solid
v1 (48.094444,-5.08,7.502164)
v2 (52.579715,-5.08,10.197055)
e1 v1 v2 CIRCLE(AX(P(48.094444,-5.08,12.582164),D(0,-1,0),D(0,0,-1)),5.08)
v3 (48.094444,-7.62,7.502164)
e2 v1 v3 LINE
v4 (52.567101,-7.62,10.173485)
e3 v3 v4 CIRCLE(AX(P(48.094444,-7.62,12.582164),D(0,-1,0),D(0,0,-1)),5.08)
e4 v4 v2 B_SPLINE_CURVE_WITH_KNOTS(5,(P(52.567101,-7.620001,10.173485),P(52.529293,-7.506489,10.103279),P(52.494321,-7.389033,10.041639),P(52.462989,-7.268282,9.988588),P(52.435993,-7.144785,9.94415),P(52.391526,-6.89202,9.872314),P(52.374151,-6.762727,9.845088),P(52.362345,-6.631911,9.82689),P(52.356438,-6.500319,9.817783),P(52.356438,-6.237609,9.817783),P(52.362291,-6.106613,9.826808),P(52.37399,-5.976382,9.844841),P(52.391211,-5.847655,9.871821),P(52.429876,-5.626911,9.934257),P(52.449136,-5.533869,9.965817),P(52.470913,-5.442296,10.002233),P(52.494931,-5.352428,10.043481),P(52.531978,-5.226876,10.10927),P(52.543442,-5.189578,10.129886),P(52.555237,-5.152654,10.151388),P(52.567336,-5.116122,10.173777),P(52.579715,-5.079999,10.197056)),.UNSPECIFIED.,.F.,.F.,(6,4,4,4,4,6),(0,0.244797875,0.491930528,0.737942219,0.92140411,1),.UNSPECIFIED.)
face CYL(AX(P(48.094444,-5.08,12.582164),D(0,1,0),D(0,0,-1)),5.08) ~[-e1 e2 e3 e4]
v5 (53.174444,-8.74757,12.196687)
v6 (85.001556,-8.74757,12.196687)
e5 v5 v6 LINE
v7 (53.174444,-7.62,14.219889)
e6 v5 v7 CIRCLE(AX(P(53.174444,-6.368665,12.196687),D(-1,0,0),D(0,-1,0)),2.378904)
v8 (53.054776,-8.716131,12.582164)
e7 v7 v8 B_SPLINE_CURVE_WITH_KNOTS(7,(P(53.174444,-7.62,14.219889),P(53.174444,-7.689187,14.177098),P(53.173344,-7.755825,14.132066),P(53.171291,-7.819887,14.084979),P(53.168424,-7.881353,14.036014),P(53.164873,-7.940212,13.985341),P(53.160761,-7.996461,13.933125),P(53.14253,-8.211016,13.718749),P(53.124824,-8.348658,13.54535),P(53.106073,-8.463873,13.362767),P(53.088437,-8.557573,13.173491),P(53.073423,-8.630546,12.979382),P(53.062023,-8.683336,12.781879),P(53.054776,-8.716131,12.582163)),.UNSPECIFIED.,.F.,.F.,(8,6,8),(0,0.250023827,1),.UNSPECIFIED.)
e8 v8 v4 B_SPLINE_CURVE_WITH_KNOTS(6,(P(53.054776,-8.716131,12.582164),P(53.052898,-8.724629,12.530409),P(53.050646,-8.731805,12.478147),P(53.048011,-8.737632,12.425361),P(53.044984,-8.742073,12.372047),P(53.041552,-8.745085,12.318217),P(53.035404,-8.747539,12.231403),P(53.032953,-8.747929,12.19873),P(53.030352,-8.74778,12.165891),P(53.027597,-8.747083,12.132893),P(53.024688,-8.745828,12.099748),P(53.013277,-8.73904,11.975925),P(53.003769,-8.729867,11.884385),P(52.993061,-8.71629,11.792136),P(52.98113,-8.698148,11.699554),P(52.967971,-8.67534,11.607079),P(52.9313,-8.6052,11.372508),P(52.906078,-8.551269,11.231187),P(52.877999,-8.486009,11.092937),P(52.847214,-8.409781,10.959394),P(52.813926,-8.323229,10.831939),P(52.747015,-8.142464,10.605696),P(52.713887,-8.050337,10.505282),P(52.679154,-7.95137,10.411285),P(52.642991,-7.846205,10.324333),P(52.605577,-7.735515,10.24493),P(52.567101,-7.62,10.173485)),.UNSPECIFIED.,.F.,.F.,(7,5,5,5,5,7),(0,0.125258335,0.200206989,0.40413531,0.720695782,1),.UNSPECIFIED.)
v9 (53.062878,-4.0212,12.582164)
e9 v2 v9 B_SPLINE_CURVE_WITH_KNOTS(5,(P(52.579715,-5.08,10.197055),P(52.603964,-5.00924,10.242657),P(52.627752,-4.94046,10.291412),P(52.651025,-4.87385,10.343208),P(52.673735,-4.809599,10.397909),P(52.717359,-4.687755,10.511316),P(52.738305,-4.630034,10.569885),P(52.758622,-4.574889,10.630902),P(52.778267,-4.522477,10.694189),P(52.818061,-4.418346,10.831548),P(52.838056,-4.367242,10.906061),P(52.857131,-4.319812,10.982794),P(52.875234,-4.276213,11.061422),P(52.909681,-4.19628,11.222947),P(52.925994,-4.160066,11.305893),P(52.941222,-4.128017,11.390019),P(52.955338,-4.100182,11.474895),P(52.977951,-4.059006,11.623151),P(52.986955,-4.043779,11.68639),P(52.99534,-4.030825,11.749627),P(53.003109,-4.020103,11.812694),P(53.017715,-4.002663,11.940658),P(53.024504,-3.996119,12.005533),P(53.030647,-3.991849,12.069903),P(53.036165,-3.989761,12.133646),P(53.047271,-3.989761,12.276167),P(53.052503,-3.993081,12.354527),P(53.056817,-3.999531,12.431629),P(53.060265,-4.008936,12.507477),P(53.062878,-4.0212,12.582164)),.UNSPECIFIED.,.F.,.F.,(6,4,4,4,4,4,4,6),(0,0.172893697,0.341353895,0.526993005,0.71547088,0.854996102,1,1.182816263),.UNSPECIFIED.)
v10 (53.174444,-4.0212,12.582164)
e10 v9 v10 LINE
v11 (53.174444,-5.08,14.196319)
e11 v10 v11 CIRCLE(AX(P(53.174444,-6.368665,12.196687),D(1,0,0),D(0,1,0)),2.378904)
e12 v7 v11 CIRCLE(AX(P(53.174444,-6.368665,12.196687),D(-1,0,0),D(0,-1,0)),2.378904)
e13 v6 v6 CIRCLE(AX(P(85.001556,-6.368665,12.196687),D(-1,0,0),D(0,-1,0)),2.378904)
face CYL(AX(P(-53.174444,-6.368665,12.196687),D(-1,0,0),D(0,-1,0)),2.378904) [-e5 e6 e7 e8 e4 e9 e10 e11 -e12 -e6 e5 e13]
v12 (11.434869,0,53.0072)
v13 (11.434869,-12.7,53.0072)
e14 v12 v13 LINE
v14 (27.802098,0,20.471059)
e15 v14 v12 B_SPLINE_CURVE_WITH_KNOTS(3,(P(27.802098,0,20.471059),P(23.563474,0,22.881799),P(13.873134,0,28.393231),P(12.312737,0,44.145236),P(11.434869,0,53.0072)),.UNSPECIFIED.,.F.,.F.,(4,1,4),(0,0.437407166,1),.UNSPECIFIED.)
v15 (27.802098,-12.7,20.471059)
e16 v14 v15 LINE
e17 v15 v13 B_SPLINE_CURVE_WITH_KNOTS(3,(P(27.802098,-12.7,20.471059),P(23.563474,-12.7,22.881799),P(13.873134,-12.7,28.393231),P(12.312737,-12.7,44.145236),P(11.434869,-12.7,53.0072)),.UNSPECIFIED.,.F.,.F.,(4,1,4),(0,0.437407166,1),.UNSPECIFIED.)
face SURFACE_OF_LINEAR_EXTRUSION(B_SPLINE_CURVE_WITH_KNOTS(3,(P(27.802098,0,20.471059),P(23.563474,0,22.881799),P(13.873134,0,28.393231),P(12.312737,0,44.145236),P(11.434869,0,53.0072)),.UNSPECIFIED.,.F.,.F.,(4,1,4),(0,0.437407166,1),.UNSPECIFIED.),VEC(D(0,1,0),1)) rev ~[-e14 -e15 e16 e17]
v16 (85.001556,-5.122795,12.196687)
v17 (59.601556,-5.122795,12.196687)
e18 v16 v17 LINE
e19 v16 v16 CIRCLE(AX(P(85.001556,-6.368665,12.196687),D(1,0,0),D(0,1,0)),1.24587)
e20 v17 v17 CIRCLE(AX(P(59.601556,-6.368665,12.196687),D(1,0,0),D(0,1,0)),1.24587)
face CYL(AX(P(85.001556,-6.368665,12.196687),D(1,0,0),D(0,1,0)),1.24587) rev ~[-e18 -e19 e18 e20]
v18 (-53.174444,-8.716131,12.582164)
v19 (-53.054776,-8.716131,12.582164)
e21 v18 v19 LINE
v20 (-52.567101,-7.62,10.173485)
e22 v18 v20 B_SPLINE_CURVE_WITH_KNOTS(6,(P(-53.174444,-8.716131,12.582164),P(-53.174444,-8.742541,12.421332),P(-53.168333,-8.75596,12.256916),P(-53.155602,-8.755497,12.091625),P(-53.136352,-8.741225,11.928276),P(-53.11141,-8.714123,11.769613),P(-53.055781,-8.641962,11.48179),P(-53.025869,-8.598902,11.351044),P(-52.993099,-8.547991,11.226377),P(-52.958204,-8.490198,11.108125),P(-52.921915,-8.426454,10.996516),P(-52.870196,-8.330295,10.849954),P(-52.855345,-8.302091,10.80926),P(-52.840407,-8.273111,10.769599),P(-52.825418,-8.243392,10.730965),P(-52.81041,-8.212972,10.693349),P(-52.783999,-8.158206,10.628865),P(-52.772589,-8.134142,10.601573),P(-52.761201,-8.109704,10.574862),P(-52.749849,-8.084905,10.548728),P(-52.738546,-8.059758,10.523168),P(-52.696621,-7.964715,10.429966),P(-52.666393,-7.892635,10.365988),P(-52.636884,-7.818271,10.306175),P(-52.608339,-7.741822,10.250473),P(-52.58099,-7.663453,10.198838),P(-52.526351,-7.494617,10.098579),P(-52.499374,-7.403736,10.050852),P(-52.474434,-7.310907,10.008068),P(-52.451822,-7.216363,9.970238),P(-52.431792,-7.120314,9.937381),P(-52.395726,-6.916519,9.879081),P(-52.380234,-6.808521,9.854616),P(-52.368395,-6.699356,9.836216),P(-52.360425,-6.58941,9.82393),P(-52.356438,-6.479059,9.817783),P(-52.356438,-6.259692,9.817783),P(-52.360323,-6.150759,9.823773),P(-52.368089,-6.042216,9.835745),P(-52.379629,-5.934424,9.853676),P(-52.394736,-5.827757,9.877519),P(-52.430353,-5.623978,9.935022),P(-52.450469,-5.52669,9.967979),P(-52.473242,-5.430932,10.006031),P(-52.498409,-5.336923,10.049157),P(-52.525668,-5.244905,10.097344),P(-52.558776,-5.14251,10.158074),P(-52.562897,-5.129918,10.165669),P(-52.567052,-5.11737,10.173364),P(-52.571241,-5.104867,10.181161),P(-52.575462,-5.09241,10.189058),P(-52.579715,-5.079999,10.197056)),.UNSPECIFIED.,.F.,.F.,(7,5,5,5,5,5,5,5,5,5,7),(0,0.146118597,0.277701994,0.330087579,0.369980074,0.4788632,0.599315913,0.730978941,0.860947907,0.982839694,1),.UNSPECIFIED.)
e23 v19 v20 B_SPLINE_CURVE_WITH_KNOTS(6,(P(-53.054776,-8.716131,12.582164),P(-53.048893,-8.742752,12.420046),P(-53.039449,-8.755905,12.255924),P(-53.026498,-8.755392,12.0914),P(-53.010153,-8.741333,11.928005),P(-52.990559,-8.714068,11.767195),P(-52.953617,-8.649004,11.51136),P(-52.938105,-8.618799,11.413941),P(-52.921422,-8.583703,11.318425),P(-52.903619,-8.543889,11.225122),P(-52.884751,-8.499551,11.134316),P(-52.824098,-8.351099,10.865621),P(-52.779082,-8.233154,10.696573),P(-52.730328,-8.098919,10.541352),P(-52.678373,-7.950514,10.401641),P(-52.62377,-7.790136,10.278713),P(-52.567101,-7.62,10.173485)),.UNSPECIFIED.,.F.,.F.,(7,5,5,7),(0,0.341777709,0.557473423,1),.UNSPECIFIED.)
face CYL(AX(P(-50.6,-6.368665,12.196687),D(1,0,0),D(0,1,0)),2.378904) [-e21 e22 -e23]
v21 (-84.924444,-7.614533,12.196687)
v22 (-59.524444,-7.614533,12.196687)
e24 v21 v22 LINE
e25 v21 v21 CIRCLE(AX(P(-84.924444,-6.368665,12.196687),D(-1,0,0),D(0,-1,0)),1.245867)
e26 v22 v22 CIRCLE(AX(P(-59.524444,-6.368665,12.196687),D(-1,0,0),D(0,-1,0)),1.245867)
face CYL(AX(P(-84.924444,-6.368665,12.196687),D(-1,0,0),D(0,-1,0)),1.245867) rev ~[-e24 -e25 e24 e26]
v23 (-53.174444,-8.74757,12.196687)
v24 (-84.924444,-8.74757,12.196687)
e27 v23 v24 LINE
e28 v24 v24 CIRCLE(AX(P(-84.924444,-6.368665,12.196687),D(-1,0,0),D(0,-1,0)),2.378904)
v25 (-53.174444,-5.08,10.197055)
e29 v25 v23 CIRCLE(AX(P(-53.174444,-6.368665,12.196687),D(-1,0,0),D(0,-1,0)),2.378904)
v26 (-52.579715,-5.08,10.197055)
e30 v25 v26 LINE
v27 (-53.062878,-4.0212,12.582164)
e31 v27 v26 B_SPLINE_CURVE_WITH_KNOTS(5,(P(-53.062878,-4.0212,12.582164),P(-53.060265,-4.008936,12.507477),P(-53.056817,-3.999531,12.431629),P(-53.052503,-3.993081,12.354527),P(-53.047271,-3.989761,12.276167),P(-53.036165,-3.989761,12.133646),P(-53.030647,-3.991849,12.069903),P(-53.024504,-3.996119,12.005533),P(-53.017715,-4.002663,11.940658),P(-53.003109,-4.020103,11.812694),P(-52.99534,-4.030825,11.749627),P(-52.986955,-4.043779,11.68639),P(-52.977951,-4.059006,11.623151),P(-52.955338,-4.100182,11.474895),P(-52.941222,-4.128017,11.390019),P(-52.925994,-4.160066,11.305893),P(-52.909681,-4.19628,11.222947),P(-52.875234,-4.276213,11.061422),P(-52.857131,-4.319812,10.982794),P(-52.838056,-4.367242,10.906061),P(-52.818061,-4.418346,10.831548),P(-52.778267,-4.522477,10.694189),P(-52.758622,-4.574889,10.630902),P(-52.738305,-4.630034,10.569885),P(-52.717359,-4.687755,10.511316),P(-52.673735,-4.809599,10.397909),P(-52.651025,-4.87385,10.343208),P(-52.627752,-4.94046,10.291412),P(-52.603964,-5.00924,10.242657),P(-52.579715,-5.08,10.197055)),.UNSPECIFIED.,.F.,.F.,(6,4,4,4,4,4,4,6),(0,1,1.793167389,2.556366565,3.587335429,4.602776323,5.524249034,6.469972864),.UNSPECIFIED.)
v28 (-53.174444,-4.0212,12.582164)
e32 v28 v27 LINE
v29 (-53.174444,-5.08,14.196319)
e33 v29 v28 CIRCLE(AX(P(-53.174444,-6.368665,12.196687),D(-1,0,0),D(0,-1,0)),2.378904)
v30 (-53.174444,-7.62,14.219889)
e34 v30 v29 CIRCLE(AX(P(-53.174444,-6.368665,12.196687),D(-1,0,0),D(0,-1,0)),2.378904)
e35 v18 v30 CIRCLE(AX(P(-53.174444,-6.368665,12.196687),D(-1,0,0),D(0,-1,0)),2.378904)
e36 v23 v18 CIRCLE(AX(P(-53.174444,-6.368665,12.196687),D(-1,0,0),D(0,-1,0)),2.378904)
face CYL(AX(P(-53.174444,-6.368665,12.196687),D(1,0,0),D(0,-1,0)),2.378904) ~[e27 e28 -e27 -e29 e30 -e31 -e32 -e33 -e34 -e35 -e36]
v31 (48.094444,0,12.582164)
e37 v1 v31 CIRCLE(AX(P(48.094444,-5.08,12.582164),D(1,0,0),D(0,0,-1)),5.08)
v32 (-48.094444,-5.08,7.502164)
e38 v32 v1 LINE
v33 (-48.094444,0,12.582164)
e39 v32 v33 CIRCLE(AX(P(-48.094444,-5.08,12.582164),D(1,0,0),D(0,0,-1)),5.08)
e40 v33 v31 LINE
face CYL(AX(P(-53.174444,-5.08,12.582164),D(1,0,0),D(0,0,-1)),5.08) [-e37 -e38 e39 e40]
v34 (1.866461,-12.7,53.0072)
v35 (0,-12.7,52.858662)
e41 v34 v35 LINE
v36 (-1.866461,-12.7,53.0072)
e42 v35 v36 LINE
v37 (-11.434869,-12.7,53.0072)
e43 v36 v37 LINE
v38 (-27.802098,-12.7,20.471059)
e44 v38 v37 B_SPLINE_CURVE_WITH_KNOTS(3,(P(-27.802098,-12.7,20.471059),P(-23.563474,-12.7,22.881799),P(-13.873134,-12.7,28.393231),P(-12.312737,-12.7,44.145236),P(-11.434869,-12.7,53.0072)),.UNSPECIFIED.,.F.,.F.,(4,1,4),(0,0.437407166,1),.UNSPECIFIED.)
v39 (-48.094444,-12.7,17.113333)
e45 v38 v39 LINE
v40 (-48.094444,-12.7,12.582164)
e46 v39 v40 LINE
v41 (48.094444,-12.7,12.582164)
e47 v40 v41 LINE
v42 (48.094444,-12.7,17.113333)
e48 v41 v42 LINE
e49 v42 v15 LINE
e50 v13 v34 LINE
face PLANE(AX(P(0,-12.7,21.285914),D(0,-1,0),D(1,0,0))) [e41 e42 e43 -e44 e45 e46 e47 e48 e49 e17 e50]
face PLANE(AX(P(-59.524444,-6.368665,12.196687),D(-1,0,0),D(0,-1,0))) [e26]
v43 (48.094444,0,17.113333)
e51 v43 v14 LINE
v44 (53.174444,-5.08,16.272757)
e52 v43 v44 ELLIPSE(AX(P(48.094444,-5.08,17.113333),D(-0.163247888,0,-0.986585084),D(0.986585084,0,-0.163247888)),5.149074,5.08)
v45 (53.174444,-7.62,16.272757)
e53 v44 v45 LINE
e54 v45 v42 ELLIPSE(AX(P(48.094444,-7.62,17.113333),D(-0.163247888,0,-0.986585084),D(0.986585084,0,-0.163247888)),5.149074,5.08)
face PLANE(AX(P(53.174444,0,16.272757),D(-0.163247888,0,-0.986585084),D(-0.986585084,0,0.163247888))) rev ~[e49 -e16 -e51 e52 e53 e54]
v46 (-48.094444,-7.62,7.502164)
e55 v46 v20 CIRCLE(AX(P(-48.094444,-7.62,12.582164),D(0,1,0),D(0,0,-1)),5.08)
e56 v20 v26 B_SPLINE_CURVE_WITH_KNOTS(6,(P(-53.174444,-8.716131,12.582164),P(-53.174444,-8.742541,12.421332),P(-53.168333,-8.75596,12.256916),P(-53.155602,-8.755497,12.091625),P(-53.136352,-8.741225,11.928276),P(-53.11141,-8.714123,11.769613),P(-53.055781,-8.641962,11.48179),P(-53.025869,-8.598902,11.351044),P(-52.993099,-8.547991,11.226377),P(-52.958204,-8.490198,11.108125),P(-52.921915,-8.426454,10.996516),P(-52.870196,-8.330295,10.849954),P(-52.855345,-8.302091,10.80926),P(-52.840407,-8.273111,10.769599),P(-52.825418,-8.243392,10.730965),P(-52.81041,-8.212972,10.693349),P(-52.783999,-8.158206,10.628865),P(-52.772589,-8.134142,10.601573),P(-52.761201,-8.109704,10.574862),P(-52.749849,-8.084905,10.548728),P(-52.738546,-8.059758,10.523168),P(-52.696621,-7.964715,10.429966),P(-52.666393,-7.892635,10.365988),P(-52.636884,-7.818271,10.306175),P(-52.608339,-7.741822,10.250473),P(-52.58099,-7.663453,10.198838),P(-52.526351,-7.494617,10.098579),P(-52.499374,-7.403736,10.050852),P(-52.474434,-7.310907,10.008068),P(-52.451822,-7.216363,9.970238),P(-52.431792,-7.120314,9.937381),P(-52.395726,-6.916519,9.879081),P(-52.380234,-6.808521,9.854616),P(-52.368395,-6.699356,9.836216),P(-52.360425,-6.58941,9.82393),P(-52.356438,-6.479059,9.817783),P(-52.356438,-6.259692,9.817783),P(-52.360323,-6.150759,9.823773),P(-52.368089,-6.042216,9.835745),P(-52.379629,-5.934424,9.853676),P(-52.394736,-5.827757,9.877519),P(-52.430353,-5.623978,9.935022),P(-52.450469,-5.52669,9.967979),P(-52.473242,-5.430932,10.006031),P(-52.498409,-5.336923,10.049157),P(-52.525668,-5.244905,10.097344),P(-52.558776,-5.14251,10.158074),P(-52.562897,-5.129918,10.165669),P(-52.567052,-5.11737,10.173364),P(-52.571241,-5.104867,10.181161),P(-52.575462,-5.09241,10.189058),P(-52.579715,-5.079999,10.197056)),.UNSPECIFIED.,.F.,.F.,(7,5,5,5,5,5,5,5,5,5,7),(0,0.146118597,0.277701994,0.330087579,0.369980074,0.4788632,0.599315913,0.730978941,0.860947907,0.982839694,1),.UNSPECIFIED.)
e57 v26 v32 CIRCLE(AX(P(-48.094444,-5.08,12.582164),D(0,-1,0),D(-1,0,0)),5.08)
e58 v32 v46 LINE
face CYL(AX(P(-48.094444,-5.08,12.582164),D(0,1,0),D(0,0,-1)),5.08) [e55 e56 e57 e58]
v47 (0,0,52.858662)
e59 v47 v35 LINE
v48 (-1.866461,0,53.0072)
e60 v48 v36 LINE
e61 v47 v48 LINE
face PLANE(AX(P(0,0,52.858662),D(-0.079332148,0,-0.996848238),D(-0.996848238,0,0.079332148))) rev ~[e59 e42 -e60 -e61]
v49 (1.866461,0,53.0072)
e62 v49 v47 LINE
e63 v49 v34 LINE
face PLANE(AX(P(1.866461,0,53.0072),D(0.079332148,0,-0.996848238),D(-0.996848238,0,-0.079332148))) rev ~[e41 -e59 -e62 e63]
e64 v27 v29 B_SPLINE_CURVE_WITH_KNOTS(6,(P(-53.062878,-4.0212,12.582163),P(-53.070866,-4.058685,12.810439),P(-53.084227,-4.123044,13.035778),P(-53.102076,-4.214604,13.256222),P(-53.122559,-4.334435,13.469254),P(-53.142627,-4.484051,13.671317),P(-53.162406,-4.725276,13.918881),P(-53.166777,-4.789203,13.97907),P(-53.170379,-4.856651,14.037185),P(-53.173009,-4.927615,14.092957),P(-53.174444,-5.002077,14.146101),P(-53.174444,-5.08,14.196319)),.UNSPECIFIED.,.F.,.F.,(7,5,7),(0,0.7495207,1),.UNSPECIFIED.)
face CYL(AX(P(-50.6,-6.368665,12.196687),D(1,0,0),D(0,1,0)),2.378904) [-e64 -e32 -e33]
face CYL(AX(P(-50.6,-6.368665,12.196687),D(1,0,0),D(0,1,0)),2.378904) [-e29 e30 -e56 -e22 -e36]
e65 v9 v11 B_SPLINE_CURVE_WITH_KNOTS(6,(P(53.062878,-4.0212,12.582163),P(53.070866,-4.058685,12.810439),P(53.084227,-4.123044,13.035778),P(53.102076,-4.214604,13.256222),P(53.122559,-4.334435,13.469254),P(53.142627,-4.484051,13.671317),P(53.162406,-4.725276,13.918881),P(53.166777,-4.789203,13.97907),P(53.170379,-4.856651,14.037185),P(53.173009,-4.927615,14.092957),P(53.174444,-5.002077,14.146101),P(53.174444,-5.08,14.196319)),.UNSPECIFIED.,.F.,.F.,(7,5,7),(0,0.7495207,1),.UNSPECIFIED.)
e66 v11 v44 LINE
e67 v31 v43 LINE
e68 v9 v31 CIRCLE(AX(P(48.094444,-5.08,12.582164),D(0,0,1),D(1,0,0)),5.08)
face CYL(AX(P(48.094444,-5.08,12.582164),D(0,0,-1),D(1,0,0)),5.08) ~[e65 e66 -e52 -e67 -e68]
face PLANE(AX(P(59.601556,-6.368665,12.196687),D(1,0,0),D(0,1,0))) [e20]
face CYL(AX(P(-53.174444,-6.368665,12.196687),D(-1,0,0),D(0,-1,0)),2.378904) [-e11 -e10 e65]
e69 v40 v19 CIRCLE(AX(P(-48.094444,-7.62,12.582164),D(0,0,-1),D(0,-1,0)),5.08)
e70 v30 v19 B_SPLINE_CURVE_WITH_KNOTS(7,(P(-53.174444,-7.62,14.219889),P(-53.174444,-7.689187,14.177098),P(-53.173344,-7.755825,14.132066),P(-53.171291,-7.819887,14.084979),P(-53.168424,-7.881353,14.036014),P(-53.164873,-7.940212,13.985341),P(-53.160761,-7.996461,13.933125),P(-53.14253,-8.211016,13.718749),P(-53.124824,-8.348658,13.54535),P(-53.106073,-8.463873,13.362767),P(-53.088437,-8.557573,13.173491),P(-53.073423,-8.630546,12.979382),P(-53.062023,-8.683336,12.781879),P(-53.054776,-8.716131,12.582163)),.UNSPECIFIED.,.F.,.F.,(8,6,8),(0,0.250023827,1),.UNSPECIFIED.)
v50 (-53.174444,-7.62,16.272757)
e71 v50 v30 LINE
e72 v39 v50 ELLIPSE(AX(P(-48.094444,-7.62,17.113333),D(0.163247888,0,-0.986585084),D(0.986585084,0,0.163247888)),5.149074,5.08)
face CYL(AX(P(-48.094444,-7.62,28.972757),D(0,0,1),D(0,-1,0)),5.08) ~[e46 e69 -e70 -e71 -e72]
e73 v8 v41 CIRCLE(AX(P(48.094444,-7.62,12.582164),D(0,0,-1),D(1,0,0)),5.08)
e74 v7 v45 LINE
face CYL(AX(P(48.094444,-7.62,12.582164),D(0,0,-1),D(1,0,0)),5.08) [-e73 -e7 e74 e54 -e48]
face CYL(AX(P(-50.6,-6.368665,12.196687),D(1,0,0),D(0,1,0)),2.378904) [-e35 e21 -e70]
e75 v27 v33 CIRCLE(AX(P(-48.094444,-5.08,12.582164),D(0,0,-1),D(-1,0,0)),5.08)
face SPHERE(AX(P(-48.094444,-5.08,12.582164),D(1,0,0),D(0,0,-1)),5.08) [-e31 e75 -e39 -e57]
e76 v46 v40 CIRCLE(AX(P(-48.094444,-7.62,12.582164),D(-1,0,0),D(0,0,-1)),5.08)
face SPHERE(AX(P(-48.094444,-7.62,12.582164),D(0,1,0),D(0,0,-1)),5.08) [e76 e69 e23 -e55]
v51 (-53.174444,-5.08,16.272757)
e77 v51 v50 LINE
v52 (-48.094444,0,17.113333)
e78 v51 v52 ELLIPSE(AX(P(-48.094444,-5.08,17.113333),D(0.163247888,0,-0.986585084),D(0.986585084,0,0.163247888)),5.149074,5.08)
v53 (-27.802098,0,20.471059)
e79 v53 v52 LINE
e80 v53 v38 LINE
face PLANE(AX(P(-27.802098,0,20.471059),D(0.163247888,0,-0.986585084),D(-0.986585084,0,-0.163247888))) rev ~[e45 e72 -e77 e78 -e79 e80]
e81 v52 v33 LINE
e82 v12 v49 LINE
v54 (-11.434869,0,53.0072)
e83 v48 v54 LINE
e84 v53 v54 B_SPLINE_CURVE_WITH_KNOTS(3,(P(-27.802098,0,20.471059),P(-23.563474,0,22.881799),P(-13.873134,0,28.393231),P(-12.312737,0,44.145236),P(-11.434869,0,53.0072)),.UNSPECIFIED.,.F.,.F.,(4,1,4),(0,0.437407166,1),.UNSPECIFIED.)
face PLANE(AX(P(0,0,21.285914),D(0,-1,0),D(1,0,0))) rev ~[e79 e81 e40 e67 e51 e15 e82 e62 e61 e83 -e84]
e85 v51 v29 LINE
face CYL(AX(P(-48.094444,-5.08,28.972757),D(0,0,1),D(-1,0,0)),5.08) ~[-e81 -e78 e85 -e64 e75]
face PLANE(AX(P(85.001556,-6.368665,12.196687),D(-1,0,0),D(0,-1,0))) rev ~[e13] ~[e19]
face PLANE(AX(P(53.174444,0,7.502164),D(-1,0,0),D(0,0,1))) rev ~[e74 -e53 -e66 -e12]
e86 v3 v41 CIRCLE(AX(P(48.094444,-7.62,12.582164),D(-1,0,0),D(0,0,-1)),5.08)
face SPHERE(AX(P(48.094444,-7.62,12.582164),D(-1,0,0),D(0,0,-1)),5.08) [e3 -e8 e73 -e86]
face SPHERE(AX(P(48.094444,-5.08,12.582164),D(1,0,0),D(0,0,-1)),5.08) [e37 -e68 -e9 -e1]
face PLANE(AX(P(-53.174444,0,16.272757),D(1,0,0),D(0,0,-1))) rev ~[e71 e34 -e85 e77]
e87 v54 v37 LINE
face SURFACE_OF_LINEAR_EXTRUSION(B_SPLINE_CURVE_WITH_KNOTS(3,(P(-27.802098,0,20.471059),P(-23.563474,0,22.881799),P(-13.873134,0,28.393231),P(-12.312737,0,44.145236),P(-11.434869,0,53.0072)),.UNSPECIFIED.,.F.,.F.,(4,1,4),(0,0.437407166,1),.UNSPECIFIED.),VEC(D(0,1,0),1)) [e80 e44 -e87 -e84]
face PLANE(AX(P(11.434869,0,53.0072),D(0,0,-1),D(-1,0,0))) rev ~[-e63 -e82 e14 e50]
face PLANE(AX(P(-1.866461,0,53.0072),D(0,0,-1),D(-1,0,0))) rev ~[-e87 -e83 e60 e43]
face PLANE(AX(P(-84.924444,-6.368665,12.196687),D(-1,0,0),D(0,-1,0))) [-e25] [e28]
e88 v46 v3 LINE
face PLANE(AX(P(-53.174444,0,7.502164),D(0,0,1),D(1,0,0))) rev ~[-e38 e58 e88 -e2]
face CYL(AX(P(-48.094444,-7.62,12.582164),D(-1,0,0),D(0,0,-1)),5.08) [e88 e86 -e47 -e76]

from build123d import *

# Parameters (mm, degrees)
F1_DEPTH      = 12.7
F2_R          = 2.3789042868
F3_DEPTH      = 31.75
F3_DEPTH_BACK = 138.176
F4_R          = 5.08
F5_T4_ANGLE   = 90
F5_S5_R       = 2.3789042868
F5_T6_DEPTH   = 6
F5_T10_DEPTH  = 20.32
F5_S11_R      = 2.3789042868
F5_T12_DEPTH  = 12
F5_T16_DEPTH  = 16.390593442
F5_S17_R      = 2.3789042868
F5_T18_DEPTH  = 10
F6_T1_DEPTH   = 113.968887086
F6_T6_ANGLE   = 90.0000000017
F6_S7_R       = 2.3789042868
F6_T8_DEPTH   = 6
F6_T12_DEPTH  = 16.390593442
F6_S13_R      = 2.3789042868
F6_T14_DEPTH  = 10
F7_R          = 1.2458673334
F8_DEPTH      = 25.4
F9_T4_DEPTH   = 16.390593442
F9_S5_R       = 2.3789042868
F9_T6_DEPTH   = 10
F9_T10_DEPTH  = 16.390593442
F9_S11_R      = 2.3789042868
F9_T12_DEPTH  = 10
F9_T16_ANGLE  = 90
F9_S17_R      = 2.3789042868
F9_T18_DEPTH  = 6
F9_T22_DEPTH  = 2.54
F9_S23_R      = 2.3789042868
F9_T24_DEPTH  = 5
F9_T28_ANGLE  = 90.0000000017
F9_S29_R      = 2.3789042868
F9_T30_DEPTH  = 6
F10_R         = 1.24587
F11_DEPTH     = 25.4


# Not quite as in the source:
# - a fillet or chamfer that OpenCascade refuses, or shapes differently, is made with other operations: its cross-section is extruded or revolved along the edge and cut away or added


with BuildPart() as f1:
    # F0 (on Front) → F1 (new body)
    with BuildSketch(Plane.XZ):
        with BuildLine():
            Line((-53.174443543, 7.5021637604), (0, 7.5021637604))
            Line((0, 7.5021637604), (53.174443543, 7.5021637604))
            Line((53.174443543, 7.5021637604), (53.174443543, 16.2727572024))
            Line((53.174443543, 16.2727572024), (27.8020980501, 20.4710588867))
            add(Edge.make_bspline(
                [(27.8020980501, 20.4710588867), (23.5634737704, 22.8817989501), (13.8731335003, 28.3932314282), (12.3127368707, 44.1452356637), (11.4348689094, 53.0072003603)],
                knots=[0, 0, 0, 0, 0.4374071665, 1, 1, 1, 1], degree=3))
            Line((11.4348689094, 53.0072003603), (1.8664607778, 53.0072003603))
            Line((1.8664607778, 53.0072003603), (0, 52.8586618602))
            Line((0, 52.8586618602), (-1.8664607778, 53.0072003603))
            Line((-1.8664607778, 53.0072003603), (-11.4348689094, 53.0072003603))
            add(Edge.make_bspline(
                [(-27.8020980501, 20.4710588867), (-23.5634737704, 22.8817989501), (-13.8731335003, 28.3932314282), (-12.3127368707, 44.1452356637), (-11.4348689094, 53.0072003603)],
                knots=[0, 0, 0, 0, 0.4374071665, 1, 1, 1, 1], degree=3))
            Line((-27.8020980501, 20.4710588867), (-53.174443543, 16.2727572024))
            Line((-53.174443543, 16.2727572024), (-53.174443543, 7.5021637604))
        make_face()
    extrude(amount=F1_DEPTH)

    # F2 (on face) → F3 (join, two sides)
    with BuildSketch(Plane(origin=(-53.174443543, 0, 0), x_dir=(0, -1, 0), z_dir=(-1, 0, 0))) as f3_sk:
        with Locations((6.3686654903, 12.1966870502)):
            Circle(F2_R)
    extrude(amount=F3_DEPTH)
    extrude(f3_sk.sketch, amount=-F3_DEPTH_BACK)

    # F4
    f4_edges = [f1.edges().sort_by_distance(p)[0] for p in [
        (0, 0, 7.502164),
    ]]
    fillet(f4_edges, radius=F4_R)

    # F5: fillet of radius 5.08 on 1 edges, made by hand


with BuildPart() as f5_tool2:
    # F5_s3 → F5_t4 (revolve)
    with BuildSketch(Plane.XZ.offset(5.08)):
        with BuildLine():
            ThreePointArc((-53.174443543, 12.5821637604), (-51.6865459914, 8.9900613119), (-48.094443543, 7.5021637604))
            Line((-48.094443543, 7.5021637604), (-53.174443543, 7.5021637604))
            Line((-53.174443543, 7.5021637604), (-53.174443543, 12.5821637604))
        make_face()
    revolve(axis=Axis((-53.174443543, -5.08, 12.5821637604), (1, 0, 0)), revolution_arc=F5_T4_ANGLE)

    # F5_s5 → F5_t6 (cut, symmetric)
    with BuildSketch(Plane.YZ.offset(-50.6)):
        with Locations((-6.3686654903, 12.1966870502)):
            Circle(F5_S5_R)
    extrude(amount=F5_T6_DEPTH, both=True, mode=Mode.SUBTRACT)


with BuildPart() as f1_1:
    add(f1.part)

    # F5_t1: cut F5_tool2
    add(f5_tool2.part, mode=Mode.SUBTRACT)


with BuildPart() as f5_tool8:
    # F5_s9 → F5_t10 (new body)
    with BuildSketch(Plane.XZ.offset(5.08)):
        with BuildLine():
            ThreePointArc((-48.094443543, 7.5021637604), (-51.6865459914, 8.9900613119), (-53.174443543, 12.5821637604))
            Line((-53.174443543, 12.5821637604), (-53.174443543, 7.5021637604))
            Line((-53.174443543, 7.5021637604), (-48.094443543, 7.5021637604))
        make_face()
    extrude(amount=F5_T10_DEPTH)

    # F5_s11 → F5_t12 (cut, symmetric)
    with BuildSketch(Plane.YZ.offset(-50.6)):
        with Locations((-6.3686654903, 12.1966870502)):
            Circle(F5_S11_R)
    extrude(amount=F5_T12_DEPTH, both=True, mode=Mode.SUBTRACT)


with BuildPart() as f1_2:
    add(f1_1.part)

    # F5_t7: cut F5_tool8
    add(f5_tool8.part, mode=Mode.SUBTRACT)


with BuildPart() as f5_tool14:
    # F5_s15 → F5_t16 (new body)
    with BuildSketch(Plane.XY.offset(28.9727572024)):
        with BuildLine():
            ThreePointArc((-53.174443543, -5.08), (-51.6865459914, -1.4878975516), (-48.094443543, 0))
            Line((-48.094443543, 0), (-53.174443543, 0))
            Line((-53.174443543, 0), (-53.174443543, -5.08))
        make_face()
    extrude(amount=-F5_T16_DEPTH)

    # F5_s17 → F5_t18 (cut, symmetric)
    with BuildSketch(Plane.YZ.offset(-50.6)):
        with Locations((-6.3686654903, 12.1966870502)):
            Circle(F5_S17_R)
    extrude(amount=F5_T18_DEPTH, both=True, mode=Mode.SUBTRACT)


with BuildPart() as f1_3:
    add(f1_2.part)

    # F5_t13: cut F5_tool14
    add(f5_tool14.part, mode=Mode.SUBTRACT)

    # F6: fillet of radius 5.08 on 1 edges, made by hand

    # F6_s2 → F6_t1 (cut)
    with BuildSketch(Plane.YZ.offset(-48.094443543)):
        with BuildLine():
            ThreePointArc((-7.62, 7.5021637604), (-11.2121024484, 8.9900613119), (-12.7, 12.5821637604))
            Line((-12.7, 12.5821637604), (-12.7, 7.5021637604))
            Line((-12.7, 7.5021637604), (-7.62, 7.5021637604))
        make_face()
    extrude(amount=F6_T1_DEPTH, mode=Mode.SUBTRACT)


with BuildPart() as f6_tool4:
    # F6_s5 → F6_t6 (revolve)
    with BuildSketch(Plane.YZ.offset(-48.0944435431)):
        with BuildLine():
            ThreePointArc((-12.7, 12.5821637604), (-11.2121024484, 8.990061312), (-7.62, 7.5021637604))
            Line((-7.62, 7.5021637604), (-12.7, 7.5021637604))
            Line((-12.7, 7.5021637604), (-12.7, 12.5821637604))
        make_face()
    revolve(axis=Axis((-48.0944435431, -12.7, 12.5821637603), (0, 1, 0)), revolution_arc=F6_T6_ANGLE)

    # F6_s7 → F6_t8 (cut, symmetric)
    with BuildSketch(Plane.YZ.offset(-50.6)):
        with Locations((-6.3686654903, 12.1966870502)):
            Circle(F6_S7_R)
    extrude(amount=F6_T8_DEPTH, both=True, mode=Mode.SUBTRACT)


with BuildPart() as f1_4:
    add(f1_3.part)

    # F6_t3: cut F6_tool4
    add(f6_tool4.part, mode=Mode.SUBTRACT)


with BuildPart() as f6_tool10:
    # F6_s11 → F6_t12 (new body)
    with BuildSketch(Plane.XY.offset(28.9727572024)):
        with BuildLine():
            ThreePointArc((-48.094443543, -12.7), (-51.6865459914, -11.2121024484), (-53.174443543, -7.62))
            Line((-53.174443543, -7.62), (-53.174443543, -12.7))
            Line((-53.174443543, -12.7), (-48.094443543, -12.7))
        make_face()
    extrude(amount=-F6_T12_DEPTH)

    # F6_s13 → F6_t14 (cut, symmetric)
    with BuildSketch(Plane.YZ.offset(-50.6)):
        with Locations((-6.3686654903, 12.1966870502)):
            Circle(F6_S13_R)
    extrude(amount=F6_T14_DEPTH, both=True, mode=Mode.SUBTRACT)


with BuildPart() as f1_5:
    add(f1_4.part)

    # F6_t9: cut F6_tool10
    add(f6_tool10.part, mode=Mode.SUBTRACT)

    # F7 (on face) → F8 (cut)
    with BuildSketch(Plane(origin=(-84.924443543, 0, 0), x_dir=(0, -1, 0), z_dir=(-1, 0, 0))):
        with Locations((6.3686654903, 12.1966870502)):
            Circle(F7_R)
    extrude(amount=-F8_DEPTH, mode=Mode.SUBTRACT)

    # F9: fillet of radius 5.08 on 2 edges, made by hand


with BuildPart() as f9_tool2:
    # F9_s3 → F9_t4 (new body)
    with BuildSketch(Plane.XY.offset(12.5821637604)):
        with BuildLine():
            ThreePointArc((53.174443543, -7.62), (51.6865459914, -11.2121024484), (48.094443543, -12.7))
            Line((48.094443543, -12.7), (53.174443543, -12.7))
            Line((53.174443543, -12.7), (53.174443543, -7.62))
        make_face()
    extrude(amount=F9_T4_DEPTH)

    # F9_s5 → F9_t6 (cut, symmetric)
    with BuildSketch(Plane.YZ.offset(50.6)):
        with Locations((-6.3686654903, 12.1966870502)):
            Circle(F9_S5_R)
    extrude(amount=F9_T6_DEPTH, both=True, mode=Mode.SUBTRACT)


with BuildPart() as f1_6:
    add(f1_5.part)

    # F9_t1: cut F9_tool2
    add(f9_tool2.part, mode=Mode.SUBTRACT)


with BuildPart() as f9_tool8:
    # F9_s9 → F9_t10 (new body)
    with BuildSketch(Plane.XY.offset(12.5821637604)):
        with BuildLine():
            ThreePointArc((53.174443543, -5.08), (51.6865459914, -1.4878975516), (48.094443543, 0))
            Line((48.094443543, 0), (53.174443543, 0))
            Line((53.174443543, 0), (53.174443543, -5.08))
        make_face()
    extrude(amount=F9_T10_DEPTH)

    # F9_s11 → F9_t12 (cut, symmetric)
    with BuildSketch(Plane.YZ.offset(50.6)):
        with Locations((-6.3686654903, 12.1966870502)):
            Circle(F9_S11_R)
    extrude(amount=F9_T12_DEPTH, both=True, mode=Mode.SUBTRACT)


with BuildPart() as f1_7:
    add(f1_6.part)

    # F9_t7: cut F9_tool8
    add(f9_tool8.part, mode=Mode.SUBTRACT)


with BuildPart() as f9_tool14:
    # F9_s15 → F9_t16 (revolve)
    with BuildSketch(Plane.XZ.offset(5.08)):
        with BuildLine():
            ThreePointArc((48.094443543, 7.5021637604), (51.6865459914, 8.9900613119), (53.174443543, 12.5821637604))
            Line((53.174443543, 12.5821637604), (53.174443543, 7.5021637604))
            Line((53.174443543, 7.5021637604), (48.094443543, 7.5021637604))
        make_face()
    revolve(axis=Axis((53.174443543, -5.08, 12.5821637604), (1, 0, 0)), revolution_arc=F9_T16_ANGLE)

    # F9_s17 → F9_t18 (cut, symmetric)
    with BuildSketch(Plane.YZ.offset(50.6)):
        with Locations((-6.3686654903, 12.1966870502)):
            Circle(F9_S17_R)
    extrude(amount=F9_T18_DEPTH, both=True, mode=Mode.SUBTRACT)


with BuildPart() as f1_8:
    add(f1_7.part)

    # F9_t13: cut F9_tool14
    add(f9_tool14.part, mode=Mode.SUBTRACT)


with BuildPart() as f9_tool20:
    # F9_s21 → F9_t22 (new body)
    with BuildSketch(Plane.XZ.offset(5.08)):
        with BuildLine():
            ThreePointArc((48.094443543, 7.5021637604), (51.6865459914, 8.9900613119), (53.174443543, 12.5821637604))
            Line((53.174443543, 12.5821637604), (53.174443543, 7.5021637604))
            Line((53.174443543, 7.5021637604), (48.094443543, 7.5021637604))
        make_face()
    extrude(amount=F9_T22_DEPTH)

    # F9_s23 → F9_t24 (cut, symmetric)
    with BuildSketch(Plane.YZ.offset(50.6)):
        with Locations((-6.3686654903, 12.1966870502)):
            Circle(F9_S23_R)
    extrude(amount=F9_T24_DEPTH, both=True, mode=Mode.SUBTRACT)


with BuildPart() as f1_9:
    add(f1_8.part)

    # F9_t19: cut F9_tool20
    add(f9_tool20.part, mode=Mode.SUBTRACT)


with BuildPart() as f9_tool26:
    # F9_s27 → F9_t28 (revolve)
    with BuildSketch(Plane.XZ.offset(7.6200000001)):
        with BuildLine():
            ThreePointArc((53.174443543, 12.5821637604), (51.6865459914, 8.990061312), (48.094443543, 7.5021637604))
            Line((48.094443543, 7.5021637604), (53.174443543, 7.5021637604))
            Line((53.174443543, 7.5021637604), (53.174443543, 12.5821637604))
        make_face()
    revolve(axis=Axis((53.174443543, -7.6200000001, 12.5821637603), (-1, 0, 0)), revolution_arc=F9_T28_ANGLE)

    # F9_s29 → F9_t30 (cut, symmetric)
    with BuildSketch(Plane.YZ.offset(50.6)):
        with Locations((-6.3686654903, 12.1966870502)):
            Circle(F9_S29_R)
    extrude(amount=F9_T30_DEPTH, both=True, mode=Mode.SUBTRACT)


with BuildPart() as f1_10:
    add(f1_9.part)

    # F9_t25: cut F9_tool26
    add(f9_tool26.part, mode=Mode.SUBTRACT)

    # F10 (on face) → F11 (cut)
    with BuildSketch(Plane.YZ.offset(85.001556457)):
        with Locations((-6.3686654903, 12.1966870502)):
            Circle(F10_R)
    extrude(amount=-F11_DEPTH, mode=Mode.SUBTRACT)


solid = f1_10.part
